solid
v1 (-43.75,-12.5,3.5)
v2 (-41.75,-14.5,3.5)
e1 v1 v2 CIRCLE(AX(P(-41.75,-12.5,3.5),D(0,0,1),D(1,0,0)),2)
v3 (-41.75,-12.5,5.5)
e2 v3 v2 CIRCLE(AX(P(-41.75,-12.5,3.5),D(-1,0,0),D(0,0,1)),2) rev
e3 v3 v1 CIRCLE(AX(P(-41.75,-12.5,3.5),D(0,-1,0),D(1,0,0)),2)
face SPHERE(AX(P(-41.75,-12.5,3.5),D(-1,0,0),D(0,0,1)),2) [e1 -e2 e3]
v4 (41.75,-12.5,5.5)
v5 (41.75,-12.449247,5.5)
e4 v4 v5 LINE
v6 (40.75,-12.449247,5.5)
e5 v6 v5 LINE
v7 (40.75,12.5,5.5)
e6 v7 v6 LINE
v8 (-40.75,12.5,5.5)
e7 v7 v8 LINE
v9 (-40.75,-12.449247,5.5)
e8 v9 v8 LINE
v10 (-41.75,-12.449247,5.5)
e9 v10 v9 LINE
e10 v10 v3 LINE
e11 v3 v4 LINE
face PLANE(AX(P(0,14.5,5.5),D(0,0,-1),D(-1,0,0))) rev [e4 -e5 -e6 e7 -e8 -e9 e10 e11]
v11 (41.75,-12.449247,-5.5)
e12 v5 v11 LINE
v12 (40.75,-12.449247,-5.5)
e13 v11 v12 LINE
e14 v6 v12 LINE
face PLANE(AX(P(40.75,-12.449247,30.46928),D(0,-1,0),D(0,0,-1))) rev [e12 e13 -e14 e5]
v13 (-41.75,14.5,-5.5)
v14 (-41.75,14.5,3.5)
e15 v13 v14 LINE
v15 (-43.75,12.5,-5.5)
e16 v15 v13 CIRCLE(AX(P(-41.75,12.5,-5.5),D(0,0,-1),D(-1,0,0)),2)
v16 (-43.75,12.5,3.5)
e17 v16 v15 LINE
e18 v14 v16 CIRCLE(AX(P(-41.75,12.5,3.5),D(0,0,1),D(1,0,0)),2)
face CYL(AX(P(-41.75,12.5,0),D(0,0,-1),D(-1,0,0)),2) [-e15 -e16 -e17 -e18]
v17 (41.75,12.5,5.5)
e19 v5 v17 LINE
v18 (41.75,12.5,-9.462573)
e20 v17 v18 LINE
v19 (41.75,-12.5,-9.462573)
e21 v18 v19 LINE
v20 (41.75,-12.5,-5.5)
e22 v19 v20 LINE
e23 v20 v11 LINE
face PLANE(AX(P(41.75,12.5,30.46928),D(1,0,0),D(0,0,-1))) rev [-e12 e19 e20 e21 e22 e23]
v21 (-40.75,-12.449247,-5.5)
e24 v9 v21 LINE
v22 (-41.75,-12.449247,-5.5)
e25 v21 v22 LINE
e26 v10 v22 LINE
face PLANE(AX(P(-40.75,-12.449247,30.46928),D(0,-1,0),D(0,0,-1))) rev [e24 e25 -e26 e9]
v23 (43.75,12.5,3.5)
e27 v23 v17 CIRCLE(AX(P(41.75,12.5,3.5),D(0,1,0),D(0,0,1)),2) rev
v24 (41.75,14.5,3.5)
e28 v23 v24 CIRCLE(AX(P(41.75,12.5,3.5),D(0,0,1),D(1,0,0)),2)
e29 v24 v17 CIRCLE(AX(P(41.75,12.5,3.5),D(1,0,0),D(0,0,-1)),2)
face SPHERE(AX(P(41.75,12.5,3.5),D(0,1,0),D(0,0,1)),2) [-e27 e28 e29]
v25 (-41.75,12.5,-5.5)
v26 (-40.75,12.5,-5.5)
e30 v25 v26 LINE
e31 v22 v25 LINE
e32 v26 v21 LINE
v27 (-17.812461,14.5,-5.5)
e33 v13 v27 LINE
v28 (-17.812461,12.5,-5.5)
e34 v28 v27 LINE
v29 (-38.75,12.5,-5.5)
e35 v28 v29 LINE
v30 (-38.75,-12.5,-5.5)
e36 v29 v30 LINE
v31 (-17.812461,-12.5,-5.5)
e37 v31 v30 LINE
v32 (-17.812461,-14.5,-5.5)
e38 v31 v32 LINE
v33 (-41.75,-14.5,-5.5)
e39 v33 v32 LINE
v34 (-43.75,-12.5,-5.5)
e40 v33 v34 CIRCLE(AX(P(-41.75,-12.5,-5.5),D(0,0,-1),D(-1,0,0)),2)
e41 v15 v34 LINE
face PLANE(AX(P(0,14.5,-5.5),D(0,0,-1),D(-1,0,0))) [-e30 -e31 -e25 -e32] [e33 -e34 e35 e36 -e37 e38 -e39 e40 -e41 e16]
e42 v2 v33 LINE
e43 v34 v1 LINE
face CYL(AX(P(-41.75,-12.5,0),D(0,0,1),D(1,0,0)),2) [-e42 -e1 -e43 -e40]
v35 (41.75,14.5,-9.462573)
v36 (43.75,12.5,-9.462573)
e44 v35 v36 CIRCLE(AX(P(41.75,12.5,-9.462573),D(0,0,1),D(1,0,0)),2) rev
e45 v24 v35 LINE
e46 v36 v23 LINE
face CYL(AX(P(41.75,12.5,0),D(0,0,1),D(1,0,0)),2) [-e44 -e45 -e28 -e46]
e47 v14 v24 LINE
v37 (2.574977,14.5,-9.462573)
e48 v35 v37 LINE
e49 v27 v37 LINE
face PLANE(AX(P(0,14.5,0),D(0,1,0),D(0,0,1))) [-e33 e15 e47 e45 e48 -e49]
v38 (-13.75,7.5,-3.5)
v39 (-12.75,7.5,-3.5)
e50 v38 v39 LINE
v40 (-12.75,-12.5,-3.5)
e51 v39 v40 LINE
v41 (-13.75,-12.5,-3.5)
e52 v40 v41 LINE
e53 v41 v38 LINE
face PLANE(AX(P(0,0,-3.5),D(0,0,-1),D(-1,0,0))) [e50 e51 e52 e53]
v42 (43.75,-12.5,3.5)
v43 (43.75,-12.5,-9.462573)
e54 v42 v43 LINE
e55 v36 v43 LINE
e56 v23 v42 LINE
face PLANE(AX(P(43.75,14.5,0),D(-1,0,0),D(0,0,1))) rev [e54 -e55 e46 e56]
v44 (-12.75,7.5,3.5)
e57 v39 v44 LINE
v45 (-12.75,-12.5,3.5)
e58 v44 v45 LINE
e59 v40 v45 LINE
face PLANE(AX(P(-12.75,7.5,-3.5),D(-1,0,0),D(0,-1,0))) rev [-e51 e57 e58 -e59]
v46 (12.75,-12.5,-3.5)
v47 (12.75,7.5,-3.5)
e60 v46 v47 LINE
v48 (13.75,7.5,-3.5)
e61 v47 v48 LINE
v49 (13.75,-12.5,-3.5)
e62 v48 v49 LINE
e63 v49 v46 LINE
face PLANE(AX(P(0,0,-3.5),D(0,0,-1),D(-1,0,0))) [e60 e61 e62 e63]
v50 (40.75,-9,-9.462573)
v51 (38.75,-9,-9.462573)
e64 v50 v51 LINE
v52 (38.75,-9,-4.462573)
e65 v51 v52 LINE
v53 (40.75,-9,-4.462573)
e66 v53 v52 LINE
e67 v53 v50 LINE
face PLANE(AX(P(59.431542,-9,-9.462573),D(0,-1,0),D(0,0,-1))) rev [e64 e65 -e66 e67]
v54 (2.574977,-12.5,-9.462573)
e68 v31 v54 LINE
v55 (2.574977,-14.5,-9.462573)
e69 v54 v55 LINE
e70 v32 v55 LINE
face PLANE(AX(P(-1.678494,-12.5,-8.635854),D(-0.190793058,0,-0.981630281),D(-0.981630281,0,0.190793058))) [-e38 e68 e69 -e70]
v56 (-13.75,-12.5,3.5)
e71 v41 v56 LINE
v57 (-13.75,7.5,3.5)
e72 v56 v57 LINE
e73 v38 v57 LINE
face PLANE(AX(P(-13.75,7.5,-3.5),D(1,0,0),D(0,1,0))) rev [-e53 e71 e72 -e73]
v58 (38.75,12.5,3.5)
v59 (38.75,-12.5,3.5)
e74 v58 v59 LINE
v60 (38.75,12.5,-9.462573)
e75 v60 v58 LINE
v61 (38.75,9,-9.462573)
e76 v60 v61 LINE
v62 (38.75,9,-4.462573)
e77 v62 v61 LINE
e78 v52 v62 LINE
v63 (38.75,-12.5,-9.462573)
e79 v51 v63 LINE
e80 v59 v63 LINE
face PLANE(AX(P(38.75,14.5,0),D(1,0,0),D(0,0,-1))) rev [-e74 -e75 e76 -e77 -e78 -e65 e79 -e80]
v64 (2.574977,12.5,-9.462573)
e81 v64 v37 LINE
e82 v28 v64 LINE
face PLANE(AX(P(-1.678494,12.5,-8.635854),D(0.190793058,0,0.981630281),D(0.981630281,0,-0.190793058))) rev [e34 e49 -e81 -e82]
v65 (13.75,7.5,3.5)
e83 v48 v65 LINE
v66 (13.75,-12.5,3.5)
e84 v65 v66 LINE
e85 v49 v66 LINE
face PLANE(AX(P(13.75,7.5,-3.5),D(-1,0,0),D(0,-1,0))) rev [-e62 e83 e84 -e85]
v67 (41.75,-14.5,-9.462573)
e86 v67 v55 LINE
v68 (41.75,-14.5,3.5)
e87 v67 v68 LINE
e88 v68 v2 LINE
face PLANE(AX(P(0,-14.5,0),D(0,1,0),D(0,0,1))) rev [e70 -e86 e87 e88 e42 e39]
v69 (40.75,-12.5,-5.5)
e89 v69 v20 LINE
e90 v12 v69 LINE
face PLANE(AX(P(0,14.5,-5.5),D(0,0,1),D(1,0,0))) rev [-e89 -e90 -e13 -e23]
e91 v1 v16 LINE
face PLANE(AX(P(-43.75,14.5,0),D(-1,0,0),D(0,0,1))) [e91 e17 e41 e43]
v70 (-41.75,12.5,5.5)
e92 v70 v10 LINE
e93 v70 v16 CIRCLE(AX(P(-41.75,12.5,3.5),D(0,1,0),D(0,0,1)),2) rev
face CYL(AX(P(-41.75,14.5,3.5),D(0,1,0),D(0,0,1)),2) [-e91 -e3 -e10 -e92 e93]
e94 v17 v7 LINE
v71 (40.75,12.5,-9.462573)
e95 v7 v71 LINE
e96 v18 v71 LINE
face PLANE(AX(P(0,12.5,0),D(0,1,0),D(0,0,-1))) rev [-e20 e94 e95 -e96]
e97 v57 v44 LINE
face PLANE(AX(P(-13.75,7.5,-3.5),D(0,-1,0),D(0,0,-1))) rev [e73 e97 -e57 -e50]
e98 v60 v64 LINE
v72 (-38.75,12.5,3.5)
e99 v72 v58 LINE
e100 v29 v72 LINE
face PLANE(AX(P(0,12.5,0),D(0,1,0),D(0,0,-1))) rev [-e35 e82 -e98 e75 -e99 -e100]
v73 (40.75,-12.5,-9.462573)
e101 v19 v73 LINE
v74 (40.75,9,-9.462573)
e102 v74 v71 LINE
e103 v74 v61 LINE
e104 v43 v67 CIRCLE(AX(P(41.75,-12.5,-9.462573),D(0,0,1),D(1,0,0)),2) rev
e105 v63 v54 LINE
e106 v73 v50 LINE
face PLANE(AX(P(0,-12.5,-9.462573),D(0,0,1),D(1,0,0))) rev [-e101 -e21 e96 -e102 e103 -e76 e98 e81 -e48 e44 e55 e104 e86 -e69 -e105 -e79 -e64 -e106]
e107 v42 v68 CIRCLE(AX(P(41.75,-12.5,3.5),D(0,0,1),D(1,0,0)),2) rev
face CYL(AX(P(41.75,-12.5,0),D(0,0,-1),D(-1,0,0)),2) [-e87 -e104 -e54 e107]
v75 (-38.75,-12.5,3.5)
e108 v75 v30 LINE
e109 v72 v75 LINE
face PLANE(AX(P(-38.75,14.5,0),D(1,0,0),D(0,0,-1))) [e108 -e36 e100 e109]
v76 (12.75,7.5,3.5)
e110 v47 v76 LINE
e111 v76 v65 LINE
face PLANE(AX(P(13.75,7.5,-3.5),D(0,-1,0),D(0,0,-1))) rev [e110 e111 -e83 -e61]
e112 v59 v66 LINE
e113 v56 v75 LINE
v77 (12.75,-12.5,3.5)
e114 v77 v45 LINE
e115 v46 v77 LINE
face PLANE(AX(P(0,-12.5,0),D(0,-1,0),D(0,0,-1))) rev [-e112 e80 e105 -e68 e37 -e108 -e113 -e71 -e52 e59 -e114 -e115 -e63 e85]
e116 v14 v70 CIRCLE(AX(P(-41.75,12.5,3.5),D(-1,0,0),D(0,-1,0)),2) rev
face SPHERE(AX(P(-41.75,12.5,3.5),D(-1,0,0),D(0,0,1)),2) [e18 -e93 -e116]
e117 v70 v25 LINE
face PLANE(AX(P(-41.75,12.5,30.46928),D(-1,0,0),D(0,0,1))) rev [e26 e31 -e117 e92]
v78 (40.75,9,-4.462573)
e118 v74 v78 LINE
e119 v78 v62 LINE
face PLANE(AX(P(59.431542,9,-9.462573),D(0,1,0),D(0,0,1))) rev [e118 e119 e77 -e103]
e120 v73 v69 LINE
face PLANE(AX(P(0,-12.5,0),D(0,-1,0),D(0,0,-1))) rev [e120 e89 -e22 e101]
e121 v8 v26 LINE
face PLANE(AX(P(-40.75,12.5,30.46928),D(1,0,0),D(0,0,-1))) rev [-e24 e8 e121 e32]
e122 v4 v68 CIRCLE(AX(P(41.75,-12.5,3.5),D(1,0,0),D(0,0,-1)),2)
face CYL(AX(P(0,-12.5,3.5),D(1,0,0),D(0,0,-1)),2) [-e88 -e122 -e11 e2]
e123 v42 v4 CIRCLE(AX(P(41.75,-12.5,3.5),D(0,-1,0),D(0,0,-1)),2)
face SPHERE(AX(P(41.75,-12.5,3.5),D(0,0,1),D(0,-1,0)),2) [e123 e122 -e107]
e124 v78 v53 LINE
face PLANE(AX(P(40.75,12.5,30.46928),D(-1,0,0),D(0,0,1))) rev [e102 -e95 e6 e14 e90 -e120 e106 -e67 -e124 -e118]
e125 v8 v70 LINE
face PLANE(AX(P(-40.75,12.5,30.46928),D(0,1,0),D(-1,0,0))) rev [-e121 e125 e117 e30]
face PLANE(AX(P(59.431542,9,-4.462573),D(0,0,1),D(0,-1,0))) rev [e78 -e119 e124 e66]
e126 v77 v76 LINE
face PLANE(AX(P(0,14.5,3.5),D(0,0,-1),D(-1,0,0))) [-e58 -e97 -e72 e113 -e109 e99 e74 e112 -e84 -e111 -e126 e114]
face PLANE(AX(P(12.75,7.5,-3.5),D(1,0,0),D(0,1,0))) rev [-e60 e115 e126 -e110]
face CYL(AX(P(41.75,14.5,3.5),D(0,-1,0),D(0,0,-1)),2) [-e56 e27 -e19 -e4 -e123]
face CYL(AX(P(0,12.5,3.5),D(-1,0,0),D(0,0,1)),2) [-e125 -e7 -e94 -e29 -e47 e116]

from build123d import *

# Parameters (mm, degrees)
BOSS_EXTRUDE1_DEPTH = 14.5
BOSS_EXTRUDE2_DEPTH = 2
SKETCH9_W           = 1
SKETCH9_H           = 24.94924747
CUT_EXTRUDE7_DEPTH  = 11
SKETCH15_W          = 2
SKETCH15_H          = 25
BOSS_EXTRUDE5_DEPTH = 3.96257304
SKETCH16_W          = 5
SKETCH16_H          = 18
CUT_EXTRUDE8_DEPTH  = 2
FILLET2_R           = 2
SKETCH17_W          = 1
SKETCH17_H          = 20
BOSS_EXTRUDE6_DEPTH = 7


with BuildPart() as part:
    # Sketch1 → Boss-Extrude1 (new, symmetric)
    with BuildSketch(Plane(origin=(0, 0, 0), x_dir=(1, 0, 0), z_dir=(0, 1, 0))):
        Polygon((-43.75, 5.5), (-43.75, -5.5), (43.75, -5.5), (43.75, 5.5), (38.75, 5.5), (38.75, 3.5), (38.75, -3.5), (-38.75, -3.5), (-38.75, 3.5), (-38.75, 5.5), align=None)
    extrude(amount=BOSS_EXTRUDE1_DEPTH, both=True)

    # Sketch8 → Boss-Extrude2 (add)
    with BuildSketch(Plane.XZ.offset(14.5)):
        Polygon((-43.75, 1), (-43.75, -5.5), (-23.804915393, -5.5), (-17.812461495, -5.5), (2.574976796, -9.46257304), (43.75, -9.46257304), (43.75, -8.5), (43.75, -4.5), (43.75, -3), (43.75, -0.96257304), (43.75, 5.5), (-43.75, 5.5), (-43.75, 3), align=None)
    boss_extrude2 = extrude(amount=-BOSS_EXTRUDE2_DEPTH)

    # Mirror1: Boss-Extrude2 across plane
    add(boss_extrude2.mirror(Plane.ZX))

    # Sketch9 → Cut-Extrude7 (cut)
    with BuildSketch(Plane(origin=(0, 0, -5.5), x_dir=(-1, 0, 0), z_dir=(0, 0, -1))):
        with Locations((-41.25, 0.025376265)):
            Rectangle(SKETCH9_W, SKETCH9_H)
        with Locations((41.25, 0.025376265)):
            Rectangle(SKETCH9_W, SKETCH9_H)
    extrude(amount=-CUT_EXTRUDE7_DEPTH, mode=Mode.SUBTRACT)

    # Sketch15 → Boss-Extrude5 (add)
    with BuildSketch(Plane(origin=(0, 0, -5.5), x_dir=(-1, 0, 0), z_dir=(0, 0, -1))):
        with Locations((-42.75, 0)):
            Rectangle(SKETCH15_W, SKETCH15_H)
        with Locations((-39.75, 0)):
            Rectangle(SKETCH15_W, SKETCH15_H)
    extrude(amount=BOSS_EXTRUDE5_DEPTH)

    # Sketch16 → Cut-Extrude8 (cut)
    with BuildSketch(Plane.ZY.offset(-38.75)):
        with Locations((-6.96257304, 0)):
            Rectangle(SKETCH16_W, SKETCH16_H)
    extrude(amount=-CUT_EXTRUDE8_DEPTH, mode=Mode.SUBTRACT)

    # Fillet2
    fillet2_edges = [part.edges().sort_by_distance(p)[0] for p in [
        (43.75, -14.5, -1.98128652),
        (0, -14.5, 5.5),
        (-43.75, -14.5, 0),
        (43.75, 0, 5.5),
        (-43.75, 0, 5.5),
        (-43.75, 14.5, 0),
        (0, 14.5, 5.5),
        (43.75, 14.5, -1.98128652),
    ]]
    fillet(fillet2_edges, radius=FILLET2_R - 0.0001)  # a hair under: the kernel refuses the full size

    # Sketch17 → Boss-Extrude6 (add)
    with BuildSketch(Plane(origin=(0, 0, 3.5), x_dir=(-1, 0, 0), z_dir=(0, 0, -1))):
        with Locations((-13.25, -2.5)):
            Rectangle(SKETCH17_W, SKETCH17_H)
        with Locations((13.25, -2.5)):
            Rectangle(SKETCH17_W, SKETCH17_H)
    extrude(amount=BOSS_EXTRUDE6_DEPTH)


solid = part.part
